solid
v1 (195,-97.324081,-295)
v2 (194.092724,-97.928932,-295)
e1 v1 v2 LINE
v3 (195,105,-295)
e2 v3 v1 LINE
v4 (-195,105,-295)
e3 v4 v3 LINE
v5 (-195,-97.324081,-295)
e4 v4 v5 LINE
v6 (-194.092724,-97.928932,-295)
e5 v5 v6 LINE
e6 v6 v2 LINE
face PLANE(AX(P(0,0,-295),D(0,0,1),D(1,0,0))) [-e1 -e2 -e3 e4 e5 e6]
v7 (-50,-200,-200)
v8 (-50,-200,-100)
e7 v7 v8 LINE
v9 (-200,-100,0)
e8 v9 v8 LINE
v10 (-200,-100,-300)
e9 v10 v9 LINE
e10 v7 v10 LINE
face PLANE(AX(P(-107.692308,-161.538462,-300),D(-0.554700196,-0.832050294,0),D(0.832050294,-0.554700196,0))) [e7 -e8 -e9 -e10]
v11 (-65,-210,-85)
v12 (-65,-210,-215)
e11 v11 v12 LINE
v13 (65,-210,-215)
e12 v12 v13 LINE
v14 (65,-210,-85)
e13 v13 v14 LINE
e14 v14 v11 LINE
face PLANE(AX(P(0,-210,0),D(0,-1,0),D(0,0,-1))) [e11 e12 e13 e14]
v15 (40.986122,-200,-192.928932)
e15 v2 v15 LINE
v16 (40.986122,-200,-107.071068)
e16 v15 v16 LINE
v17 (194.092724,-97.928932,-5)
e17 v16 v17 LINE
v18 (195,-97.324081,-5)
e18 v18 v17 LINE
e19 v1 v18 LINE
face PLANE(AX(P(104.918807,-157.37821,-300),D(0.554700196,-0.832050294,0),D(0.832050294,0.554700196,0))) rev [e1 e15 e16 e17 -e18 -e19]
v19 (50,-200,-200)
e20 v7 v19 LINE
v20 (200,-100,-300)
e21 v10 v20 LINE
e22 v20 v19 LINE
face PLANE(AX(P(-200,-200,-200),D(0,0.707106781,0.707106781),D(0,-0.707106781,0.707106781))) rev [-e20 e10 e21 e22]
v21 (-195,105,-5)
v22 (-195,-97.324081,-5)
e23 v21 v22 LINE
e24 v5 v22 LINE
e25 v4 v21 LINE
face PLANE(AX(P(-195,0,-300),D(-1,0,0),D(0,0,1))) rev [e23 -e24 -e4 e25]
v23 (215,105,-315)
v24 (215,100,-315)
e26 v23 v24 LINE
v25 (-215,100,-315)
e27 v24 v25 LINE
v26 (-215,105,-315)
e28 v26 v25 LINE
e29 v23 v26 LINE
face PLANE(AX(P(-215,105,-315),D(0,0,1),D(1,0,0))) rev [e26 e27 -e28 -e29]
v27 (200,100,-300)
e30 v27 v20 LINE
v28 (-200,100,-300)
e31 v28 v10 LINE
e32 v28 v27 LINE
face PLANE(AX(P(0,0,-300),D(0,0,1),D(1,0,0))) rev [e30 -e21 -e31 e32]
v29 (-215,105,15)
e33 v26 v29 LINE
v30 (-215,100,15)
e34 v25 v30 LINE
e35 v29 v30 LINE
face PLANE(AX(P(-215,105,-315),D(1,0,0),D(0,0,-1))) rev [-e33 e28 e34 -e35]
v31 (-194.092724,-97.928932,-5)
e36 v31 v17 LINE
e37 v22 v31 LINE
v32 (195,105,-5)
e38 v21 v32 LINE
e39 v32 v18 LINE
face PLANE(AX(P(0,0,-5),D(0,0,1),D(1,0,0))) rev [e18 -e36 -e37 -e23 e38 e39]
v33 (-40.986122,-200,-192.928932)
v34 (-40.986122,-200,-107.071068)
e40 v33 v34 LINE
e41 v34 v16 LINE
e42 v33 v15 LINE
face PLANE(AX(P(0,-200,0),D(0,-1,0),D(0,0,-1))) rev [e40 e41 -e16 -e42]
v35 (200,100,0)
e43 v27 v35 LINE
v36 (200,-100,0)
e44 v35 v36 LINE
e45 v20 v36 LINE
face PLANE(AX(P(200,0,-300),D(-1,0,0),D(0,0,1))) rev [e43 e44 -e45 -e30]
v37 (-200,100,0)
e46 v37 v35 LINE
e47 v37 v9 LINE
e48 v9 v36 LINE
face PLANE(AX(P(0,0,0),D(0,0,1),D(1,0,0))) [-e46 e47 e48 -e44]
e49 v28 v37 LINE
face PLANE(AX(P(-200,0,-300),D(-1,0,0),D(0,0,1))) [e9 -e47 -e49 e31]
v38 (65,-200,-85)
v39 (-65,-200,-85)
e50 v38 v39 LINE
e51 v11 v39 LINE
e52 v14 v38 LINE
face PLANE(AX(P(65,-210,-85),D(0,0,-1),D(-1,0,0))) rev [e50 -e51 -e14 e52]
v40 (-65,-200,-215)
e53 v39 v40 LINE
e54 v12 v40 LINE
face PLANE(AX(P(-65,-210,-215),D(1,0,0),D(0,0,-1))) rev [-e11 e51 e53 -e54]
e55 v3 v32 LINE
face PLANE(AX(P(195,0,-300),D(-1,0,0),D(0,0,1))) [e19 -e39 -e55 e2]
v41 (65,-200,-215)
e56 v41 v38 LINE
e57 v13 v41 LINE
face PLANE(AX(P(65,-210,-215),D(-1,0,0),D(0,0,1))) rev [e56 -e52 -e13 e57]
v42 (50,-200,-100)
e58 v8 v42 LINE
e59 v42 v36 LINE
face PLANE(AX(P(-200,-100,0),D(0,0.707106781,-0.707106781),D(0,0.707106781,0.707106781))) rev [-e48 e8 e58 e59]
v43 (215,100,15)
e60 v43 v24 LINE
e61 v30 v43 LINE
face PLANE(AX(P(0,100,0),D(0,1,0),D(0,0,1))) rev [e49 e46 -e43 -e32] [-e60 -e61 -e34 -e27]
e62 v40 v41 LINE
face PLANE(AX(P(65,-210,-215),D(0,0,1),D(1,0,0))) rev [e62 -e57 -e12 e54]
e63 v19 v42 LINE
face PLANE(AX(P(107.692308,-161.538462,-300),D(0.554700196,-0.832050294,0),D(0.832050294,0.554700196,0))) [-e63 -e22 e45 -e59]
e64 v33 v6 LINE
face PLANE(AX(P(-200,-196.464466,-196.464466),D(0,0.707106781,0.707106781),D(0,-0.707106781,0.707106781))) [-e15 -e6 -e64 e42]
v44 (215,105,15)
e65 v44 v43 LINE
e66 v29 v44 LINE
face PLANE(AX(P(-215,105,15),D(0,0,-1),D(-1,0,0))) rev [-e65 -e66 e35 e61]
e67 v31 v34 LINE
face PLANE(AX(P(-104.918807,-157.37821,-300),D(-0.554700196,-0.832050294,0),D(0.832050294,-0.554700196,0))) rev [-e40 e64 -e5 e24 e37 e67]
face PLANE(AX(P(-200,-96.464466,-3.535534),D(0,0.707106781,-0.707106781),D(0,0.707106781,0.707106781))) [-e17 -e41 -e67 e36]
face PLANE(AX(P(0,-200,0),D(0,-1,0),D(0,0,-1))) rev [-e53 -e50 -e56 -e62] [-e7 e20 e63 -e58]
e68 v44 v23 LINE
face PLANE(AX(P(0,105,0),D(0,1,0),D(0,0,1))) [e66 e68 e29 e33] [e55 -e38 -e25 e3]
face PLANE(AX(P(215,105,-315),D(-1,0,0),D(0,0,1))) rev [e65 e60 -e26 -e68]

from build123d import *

# Parameters (mm, degrees)
SKETCH1_W               = 400
SKETCH1_H               = 200
BOSS_EXTRUDE1_DEPTH     = 300
CUT_EXTRUDE1_DEPTH      = 413.310562562
CUT_EXTRUDE1_DEPTH_BACK = 413.310562562
SHELL1_T                = -5
SKETCH3_W               = 430
SKETCH3_H               = 330
BOSS_EXTRUDE2_DEPTH     = 5
SHELL2_START            = 100
SHELL2_OUTLINE_W        = 390
SHELL2_OUTLINE_H        = 290
SHELL2_DEPTH            = 5
SKETCH5_W               = 130
SKETCH5_H               = 130
BOSS_EXTRUDE3_DEPTH     = 10


# Read off the part's stored shape, not the designer's step: Shell2
with BuildPart() as part:
    # Sketch1 → Boss-Extrude1 (new body)
    with BuildSketch(Plane.XY):
        Rectangle(SKETCH1_W, SKETCH1_H)
        Polygon((-50, -200), (50, -200), (200, -100), (-200, -100), align=None)
    extrude(amount=-BOSS_EXTRUDE1_DEPTH)

    # Sketch2 → Cut-Extrude1 (cut, two sides: drawn at the far end of the back side and taken through both)
    with BuildSketch(Plane(origin=(0, 0, 0), x_dir=(0, 0, -1), z_dir=(1, 0, 0)).offset(-CUT_EXTRUDE1_DEPTH_BACK)):
        Polygon((0, -100), (100, -200), (0, -200), align=None)
        Polygon((300, -100), (300, -200), (200, -200), align=None)
    extrude(amount=CUT_EXTRUDE1_DEPTH + CUT_EXTRUDE1_DEPTH_BACK, mode=Mode.SUBTRACT)

    # Shell1
    shell1_openings = [part.faces().sort_by_distance(p)[0] for p in [
        (0, -200, -150),
        (0, 100, -150),
    ]]
    offset(amount=SHELL1_T, openings=shell1_openings, kind=Kind.INTERSECTION)

    # Sketch3 → Boss-Extrude2 (add)
    with BuildSketch(Plane(origin=(0, 100, 0), x_dir=(1, 0, 0), z_dir=(0, 1, 0))):
        with Locations((0, 150)):
            Rectangle(SKETCH3_W, SKETCH3_H)
    extrude(amount=BOSS_EXTRUDE2_DEPTH)

    # Shell2 outline → Shell2 (cut)
    with BuildSketch(Plane(origin=(0, 0, 0), x_dir=(1, 0, 0), z_dir=(0, 1, 0)).offset(SHELL2_START)):
        with Locations((0, 150)):
            Rectangle(SHELL2_OUTLINE_W, SHELL2_OUTLINE_H)
    extrude(amount=SHELL2_DEPTH, mode=Mode.SUBTRACT)

    # Sketch5 → Boss-Extrude3 (add)
    with BuildSketch(Plane.XZ.offset(200)):
        with Locations((0, -150)):
            Rectangle(SKETCH5_W, SKETCH5_H)
    extrude(amount=BOSS_EXTRUDE3_DEPTH)


solid = part.part
